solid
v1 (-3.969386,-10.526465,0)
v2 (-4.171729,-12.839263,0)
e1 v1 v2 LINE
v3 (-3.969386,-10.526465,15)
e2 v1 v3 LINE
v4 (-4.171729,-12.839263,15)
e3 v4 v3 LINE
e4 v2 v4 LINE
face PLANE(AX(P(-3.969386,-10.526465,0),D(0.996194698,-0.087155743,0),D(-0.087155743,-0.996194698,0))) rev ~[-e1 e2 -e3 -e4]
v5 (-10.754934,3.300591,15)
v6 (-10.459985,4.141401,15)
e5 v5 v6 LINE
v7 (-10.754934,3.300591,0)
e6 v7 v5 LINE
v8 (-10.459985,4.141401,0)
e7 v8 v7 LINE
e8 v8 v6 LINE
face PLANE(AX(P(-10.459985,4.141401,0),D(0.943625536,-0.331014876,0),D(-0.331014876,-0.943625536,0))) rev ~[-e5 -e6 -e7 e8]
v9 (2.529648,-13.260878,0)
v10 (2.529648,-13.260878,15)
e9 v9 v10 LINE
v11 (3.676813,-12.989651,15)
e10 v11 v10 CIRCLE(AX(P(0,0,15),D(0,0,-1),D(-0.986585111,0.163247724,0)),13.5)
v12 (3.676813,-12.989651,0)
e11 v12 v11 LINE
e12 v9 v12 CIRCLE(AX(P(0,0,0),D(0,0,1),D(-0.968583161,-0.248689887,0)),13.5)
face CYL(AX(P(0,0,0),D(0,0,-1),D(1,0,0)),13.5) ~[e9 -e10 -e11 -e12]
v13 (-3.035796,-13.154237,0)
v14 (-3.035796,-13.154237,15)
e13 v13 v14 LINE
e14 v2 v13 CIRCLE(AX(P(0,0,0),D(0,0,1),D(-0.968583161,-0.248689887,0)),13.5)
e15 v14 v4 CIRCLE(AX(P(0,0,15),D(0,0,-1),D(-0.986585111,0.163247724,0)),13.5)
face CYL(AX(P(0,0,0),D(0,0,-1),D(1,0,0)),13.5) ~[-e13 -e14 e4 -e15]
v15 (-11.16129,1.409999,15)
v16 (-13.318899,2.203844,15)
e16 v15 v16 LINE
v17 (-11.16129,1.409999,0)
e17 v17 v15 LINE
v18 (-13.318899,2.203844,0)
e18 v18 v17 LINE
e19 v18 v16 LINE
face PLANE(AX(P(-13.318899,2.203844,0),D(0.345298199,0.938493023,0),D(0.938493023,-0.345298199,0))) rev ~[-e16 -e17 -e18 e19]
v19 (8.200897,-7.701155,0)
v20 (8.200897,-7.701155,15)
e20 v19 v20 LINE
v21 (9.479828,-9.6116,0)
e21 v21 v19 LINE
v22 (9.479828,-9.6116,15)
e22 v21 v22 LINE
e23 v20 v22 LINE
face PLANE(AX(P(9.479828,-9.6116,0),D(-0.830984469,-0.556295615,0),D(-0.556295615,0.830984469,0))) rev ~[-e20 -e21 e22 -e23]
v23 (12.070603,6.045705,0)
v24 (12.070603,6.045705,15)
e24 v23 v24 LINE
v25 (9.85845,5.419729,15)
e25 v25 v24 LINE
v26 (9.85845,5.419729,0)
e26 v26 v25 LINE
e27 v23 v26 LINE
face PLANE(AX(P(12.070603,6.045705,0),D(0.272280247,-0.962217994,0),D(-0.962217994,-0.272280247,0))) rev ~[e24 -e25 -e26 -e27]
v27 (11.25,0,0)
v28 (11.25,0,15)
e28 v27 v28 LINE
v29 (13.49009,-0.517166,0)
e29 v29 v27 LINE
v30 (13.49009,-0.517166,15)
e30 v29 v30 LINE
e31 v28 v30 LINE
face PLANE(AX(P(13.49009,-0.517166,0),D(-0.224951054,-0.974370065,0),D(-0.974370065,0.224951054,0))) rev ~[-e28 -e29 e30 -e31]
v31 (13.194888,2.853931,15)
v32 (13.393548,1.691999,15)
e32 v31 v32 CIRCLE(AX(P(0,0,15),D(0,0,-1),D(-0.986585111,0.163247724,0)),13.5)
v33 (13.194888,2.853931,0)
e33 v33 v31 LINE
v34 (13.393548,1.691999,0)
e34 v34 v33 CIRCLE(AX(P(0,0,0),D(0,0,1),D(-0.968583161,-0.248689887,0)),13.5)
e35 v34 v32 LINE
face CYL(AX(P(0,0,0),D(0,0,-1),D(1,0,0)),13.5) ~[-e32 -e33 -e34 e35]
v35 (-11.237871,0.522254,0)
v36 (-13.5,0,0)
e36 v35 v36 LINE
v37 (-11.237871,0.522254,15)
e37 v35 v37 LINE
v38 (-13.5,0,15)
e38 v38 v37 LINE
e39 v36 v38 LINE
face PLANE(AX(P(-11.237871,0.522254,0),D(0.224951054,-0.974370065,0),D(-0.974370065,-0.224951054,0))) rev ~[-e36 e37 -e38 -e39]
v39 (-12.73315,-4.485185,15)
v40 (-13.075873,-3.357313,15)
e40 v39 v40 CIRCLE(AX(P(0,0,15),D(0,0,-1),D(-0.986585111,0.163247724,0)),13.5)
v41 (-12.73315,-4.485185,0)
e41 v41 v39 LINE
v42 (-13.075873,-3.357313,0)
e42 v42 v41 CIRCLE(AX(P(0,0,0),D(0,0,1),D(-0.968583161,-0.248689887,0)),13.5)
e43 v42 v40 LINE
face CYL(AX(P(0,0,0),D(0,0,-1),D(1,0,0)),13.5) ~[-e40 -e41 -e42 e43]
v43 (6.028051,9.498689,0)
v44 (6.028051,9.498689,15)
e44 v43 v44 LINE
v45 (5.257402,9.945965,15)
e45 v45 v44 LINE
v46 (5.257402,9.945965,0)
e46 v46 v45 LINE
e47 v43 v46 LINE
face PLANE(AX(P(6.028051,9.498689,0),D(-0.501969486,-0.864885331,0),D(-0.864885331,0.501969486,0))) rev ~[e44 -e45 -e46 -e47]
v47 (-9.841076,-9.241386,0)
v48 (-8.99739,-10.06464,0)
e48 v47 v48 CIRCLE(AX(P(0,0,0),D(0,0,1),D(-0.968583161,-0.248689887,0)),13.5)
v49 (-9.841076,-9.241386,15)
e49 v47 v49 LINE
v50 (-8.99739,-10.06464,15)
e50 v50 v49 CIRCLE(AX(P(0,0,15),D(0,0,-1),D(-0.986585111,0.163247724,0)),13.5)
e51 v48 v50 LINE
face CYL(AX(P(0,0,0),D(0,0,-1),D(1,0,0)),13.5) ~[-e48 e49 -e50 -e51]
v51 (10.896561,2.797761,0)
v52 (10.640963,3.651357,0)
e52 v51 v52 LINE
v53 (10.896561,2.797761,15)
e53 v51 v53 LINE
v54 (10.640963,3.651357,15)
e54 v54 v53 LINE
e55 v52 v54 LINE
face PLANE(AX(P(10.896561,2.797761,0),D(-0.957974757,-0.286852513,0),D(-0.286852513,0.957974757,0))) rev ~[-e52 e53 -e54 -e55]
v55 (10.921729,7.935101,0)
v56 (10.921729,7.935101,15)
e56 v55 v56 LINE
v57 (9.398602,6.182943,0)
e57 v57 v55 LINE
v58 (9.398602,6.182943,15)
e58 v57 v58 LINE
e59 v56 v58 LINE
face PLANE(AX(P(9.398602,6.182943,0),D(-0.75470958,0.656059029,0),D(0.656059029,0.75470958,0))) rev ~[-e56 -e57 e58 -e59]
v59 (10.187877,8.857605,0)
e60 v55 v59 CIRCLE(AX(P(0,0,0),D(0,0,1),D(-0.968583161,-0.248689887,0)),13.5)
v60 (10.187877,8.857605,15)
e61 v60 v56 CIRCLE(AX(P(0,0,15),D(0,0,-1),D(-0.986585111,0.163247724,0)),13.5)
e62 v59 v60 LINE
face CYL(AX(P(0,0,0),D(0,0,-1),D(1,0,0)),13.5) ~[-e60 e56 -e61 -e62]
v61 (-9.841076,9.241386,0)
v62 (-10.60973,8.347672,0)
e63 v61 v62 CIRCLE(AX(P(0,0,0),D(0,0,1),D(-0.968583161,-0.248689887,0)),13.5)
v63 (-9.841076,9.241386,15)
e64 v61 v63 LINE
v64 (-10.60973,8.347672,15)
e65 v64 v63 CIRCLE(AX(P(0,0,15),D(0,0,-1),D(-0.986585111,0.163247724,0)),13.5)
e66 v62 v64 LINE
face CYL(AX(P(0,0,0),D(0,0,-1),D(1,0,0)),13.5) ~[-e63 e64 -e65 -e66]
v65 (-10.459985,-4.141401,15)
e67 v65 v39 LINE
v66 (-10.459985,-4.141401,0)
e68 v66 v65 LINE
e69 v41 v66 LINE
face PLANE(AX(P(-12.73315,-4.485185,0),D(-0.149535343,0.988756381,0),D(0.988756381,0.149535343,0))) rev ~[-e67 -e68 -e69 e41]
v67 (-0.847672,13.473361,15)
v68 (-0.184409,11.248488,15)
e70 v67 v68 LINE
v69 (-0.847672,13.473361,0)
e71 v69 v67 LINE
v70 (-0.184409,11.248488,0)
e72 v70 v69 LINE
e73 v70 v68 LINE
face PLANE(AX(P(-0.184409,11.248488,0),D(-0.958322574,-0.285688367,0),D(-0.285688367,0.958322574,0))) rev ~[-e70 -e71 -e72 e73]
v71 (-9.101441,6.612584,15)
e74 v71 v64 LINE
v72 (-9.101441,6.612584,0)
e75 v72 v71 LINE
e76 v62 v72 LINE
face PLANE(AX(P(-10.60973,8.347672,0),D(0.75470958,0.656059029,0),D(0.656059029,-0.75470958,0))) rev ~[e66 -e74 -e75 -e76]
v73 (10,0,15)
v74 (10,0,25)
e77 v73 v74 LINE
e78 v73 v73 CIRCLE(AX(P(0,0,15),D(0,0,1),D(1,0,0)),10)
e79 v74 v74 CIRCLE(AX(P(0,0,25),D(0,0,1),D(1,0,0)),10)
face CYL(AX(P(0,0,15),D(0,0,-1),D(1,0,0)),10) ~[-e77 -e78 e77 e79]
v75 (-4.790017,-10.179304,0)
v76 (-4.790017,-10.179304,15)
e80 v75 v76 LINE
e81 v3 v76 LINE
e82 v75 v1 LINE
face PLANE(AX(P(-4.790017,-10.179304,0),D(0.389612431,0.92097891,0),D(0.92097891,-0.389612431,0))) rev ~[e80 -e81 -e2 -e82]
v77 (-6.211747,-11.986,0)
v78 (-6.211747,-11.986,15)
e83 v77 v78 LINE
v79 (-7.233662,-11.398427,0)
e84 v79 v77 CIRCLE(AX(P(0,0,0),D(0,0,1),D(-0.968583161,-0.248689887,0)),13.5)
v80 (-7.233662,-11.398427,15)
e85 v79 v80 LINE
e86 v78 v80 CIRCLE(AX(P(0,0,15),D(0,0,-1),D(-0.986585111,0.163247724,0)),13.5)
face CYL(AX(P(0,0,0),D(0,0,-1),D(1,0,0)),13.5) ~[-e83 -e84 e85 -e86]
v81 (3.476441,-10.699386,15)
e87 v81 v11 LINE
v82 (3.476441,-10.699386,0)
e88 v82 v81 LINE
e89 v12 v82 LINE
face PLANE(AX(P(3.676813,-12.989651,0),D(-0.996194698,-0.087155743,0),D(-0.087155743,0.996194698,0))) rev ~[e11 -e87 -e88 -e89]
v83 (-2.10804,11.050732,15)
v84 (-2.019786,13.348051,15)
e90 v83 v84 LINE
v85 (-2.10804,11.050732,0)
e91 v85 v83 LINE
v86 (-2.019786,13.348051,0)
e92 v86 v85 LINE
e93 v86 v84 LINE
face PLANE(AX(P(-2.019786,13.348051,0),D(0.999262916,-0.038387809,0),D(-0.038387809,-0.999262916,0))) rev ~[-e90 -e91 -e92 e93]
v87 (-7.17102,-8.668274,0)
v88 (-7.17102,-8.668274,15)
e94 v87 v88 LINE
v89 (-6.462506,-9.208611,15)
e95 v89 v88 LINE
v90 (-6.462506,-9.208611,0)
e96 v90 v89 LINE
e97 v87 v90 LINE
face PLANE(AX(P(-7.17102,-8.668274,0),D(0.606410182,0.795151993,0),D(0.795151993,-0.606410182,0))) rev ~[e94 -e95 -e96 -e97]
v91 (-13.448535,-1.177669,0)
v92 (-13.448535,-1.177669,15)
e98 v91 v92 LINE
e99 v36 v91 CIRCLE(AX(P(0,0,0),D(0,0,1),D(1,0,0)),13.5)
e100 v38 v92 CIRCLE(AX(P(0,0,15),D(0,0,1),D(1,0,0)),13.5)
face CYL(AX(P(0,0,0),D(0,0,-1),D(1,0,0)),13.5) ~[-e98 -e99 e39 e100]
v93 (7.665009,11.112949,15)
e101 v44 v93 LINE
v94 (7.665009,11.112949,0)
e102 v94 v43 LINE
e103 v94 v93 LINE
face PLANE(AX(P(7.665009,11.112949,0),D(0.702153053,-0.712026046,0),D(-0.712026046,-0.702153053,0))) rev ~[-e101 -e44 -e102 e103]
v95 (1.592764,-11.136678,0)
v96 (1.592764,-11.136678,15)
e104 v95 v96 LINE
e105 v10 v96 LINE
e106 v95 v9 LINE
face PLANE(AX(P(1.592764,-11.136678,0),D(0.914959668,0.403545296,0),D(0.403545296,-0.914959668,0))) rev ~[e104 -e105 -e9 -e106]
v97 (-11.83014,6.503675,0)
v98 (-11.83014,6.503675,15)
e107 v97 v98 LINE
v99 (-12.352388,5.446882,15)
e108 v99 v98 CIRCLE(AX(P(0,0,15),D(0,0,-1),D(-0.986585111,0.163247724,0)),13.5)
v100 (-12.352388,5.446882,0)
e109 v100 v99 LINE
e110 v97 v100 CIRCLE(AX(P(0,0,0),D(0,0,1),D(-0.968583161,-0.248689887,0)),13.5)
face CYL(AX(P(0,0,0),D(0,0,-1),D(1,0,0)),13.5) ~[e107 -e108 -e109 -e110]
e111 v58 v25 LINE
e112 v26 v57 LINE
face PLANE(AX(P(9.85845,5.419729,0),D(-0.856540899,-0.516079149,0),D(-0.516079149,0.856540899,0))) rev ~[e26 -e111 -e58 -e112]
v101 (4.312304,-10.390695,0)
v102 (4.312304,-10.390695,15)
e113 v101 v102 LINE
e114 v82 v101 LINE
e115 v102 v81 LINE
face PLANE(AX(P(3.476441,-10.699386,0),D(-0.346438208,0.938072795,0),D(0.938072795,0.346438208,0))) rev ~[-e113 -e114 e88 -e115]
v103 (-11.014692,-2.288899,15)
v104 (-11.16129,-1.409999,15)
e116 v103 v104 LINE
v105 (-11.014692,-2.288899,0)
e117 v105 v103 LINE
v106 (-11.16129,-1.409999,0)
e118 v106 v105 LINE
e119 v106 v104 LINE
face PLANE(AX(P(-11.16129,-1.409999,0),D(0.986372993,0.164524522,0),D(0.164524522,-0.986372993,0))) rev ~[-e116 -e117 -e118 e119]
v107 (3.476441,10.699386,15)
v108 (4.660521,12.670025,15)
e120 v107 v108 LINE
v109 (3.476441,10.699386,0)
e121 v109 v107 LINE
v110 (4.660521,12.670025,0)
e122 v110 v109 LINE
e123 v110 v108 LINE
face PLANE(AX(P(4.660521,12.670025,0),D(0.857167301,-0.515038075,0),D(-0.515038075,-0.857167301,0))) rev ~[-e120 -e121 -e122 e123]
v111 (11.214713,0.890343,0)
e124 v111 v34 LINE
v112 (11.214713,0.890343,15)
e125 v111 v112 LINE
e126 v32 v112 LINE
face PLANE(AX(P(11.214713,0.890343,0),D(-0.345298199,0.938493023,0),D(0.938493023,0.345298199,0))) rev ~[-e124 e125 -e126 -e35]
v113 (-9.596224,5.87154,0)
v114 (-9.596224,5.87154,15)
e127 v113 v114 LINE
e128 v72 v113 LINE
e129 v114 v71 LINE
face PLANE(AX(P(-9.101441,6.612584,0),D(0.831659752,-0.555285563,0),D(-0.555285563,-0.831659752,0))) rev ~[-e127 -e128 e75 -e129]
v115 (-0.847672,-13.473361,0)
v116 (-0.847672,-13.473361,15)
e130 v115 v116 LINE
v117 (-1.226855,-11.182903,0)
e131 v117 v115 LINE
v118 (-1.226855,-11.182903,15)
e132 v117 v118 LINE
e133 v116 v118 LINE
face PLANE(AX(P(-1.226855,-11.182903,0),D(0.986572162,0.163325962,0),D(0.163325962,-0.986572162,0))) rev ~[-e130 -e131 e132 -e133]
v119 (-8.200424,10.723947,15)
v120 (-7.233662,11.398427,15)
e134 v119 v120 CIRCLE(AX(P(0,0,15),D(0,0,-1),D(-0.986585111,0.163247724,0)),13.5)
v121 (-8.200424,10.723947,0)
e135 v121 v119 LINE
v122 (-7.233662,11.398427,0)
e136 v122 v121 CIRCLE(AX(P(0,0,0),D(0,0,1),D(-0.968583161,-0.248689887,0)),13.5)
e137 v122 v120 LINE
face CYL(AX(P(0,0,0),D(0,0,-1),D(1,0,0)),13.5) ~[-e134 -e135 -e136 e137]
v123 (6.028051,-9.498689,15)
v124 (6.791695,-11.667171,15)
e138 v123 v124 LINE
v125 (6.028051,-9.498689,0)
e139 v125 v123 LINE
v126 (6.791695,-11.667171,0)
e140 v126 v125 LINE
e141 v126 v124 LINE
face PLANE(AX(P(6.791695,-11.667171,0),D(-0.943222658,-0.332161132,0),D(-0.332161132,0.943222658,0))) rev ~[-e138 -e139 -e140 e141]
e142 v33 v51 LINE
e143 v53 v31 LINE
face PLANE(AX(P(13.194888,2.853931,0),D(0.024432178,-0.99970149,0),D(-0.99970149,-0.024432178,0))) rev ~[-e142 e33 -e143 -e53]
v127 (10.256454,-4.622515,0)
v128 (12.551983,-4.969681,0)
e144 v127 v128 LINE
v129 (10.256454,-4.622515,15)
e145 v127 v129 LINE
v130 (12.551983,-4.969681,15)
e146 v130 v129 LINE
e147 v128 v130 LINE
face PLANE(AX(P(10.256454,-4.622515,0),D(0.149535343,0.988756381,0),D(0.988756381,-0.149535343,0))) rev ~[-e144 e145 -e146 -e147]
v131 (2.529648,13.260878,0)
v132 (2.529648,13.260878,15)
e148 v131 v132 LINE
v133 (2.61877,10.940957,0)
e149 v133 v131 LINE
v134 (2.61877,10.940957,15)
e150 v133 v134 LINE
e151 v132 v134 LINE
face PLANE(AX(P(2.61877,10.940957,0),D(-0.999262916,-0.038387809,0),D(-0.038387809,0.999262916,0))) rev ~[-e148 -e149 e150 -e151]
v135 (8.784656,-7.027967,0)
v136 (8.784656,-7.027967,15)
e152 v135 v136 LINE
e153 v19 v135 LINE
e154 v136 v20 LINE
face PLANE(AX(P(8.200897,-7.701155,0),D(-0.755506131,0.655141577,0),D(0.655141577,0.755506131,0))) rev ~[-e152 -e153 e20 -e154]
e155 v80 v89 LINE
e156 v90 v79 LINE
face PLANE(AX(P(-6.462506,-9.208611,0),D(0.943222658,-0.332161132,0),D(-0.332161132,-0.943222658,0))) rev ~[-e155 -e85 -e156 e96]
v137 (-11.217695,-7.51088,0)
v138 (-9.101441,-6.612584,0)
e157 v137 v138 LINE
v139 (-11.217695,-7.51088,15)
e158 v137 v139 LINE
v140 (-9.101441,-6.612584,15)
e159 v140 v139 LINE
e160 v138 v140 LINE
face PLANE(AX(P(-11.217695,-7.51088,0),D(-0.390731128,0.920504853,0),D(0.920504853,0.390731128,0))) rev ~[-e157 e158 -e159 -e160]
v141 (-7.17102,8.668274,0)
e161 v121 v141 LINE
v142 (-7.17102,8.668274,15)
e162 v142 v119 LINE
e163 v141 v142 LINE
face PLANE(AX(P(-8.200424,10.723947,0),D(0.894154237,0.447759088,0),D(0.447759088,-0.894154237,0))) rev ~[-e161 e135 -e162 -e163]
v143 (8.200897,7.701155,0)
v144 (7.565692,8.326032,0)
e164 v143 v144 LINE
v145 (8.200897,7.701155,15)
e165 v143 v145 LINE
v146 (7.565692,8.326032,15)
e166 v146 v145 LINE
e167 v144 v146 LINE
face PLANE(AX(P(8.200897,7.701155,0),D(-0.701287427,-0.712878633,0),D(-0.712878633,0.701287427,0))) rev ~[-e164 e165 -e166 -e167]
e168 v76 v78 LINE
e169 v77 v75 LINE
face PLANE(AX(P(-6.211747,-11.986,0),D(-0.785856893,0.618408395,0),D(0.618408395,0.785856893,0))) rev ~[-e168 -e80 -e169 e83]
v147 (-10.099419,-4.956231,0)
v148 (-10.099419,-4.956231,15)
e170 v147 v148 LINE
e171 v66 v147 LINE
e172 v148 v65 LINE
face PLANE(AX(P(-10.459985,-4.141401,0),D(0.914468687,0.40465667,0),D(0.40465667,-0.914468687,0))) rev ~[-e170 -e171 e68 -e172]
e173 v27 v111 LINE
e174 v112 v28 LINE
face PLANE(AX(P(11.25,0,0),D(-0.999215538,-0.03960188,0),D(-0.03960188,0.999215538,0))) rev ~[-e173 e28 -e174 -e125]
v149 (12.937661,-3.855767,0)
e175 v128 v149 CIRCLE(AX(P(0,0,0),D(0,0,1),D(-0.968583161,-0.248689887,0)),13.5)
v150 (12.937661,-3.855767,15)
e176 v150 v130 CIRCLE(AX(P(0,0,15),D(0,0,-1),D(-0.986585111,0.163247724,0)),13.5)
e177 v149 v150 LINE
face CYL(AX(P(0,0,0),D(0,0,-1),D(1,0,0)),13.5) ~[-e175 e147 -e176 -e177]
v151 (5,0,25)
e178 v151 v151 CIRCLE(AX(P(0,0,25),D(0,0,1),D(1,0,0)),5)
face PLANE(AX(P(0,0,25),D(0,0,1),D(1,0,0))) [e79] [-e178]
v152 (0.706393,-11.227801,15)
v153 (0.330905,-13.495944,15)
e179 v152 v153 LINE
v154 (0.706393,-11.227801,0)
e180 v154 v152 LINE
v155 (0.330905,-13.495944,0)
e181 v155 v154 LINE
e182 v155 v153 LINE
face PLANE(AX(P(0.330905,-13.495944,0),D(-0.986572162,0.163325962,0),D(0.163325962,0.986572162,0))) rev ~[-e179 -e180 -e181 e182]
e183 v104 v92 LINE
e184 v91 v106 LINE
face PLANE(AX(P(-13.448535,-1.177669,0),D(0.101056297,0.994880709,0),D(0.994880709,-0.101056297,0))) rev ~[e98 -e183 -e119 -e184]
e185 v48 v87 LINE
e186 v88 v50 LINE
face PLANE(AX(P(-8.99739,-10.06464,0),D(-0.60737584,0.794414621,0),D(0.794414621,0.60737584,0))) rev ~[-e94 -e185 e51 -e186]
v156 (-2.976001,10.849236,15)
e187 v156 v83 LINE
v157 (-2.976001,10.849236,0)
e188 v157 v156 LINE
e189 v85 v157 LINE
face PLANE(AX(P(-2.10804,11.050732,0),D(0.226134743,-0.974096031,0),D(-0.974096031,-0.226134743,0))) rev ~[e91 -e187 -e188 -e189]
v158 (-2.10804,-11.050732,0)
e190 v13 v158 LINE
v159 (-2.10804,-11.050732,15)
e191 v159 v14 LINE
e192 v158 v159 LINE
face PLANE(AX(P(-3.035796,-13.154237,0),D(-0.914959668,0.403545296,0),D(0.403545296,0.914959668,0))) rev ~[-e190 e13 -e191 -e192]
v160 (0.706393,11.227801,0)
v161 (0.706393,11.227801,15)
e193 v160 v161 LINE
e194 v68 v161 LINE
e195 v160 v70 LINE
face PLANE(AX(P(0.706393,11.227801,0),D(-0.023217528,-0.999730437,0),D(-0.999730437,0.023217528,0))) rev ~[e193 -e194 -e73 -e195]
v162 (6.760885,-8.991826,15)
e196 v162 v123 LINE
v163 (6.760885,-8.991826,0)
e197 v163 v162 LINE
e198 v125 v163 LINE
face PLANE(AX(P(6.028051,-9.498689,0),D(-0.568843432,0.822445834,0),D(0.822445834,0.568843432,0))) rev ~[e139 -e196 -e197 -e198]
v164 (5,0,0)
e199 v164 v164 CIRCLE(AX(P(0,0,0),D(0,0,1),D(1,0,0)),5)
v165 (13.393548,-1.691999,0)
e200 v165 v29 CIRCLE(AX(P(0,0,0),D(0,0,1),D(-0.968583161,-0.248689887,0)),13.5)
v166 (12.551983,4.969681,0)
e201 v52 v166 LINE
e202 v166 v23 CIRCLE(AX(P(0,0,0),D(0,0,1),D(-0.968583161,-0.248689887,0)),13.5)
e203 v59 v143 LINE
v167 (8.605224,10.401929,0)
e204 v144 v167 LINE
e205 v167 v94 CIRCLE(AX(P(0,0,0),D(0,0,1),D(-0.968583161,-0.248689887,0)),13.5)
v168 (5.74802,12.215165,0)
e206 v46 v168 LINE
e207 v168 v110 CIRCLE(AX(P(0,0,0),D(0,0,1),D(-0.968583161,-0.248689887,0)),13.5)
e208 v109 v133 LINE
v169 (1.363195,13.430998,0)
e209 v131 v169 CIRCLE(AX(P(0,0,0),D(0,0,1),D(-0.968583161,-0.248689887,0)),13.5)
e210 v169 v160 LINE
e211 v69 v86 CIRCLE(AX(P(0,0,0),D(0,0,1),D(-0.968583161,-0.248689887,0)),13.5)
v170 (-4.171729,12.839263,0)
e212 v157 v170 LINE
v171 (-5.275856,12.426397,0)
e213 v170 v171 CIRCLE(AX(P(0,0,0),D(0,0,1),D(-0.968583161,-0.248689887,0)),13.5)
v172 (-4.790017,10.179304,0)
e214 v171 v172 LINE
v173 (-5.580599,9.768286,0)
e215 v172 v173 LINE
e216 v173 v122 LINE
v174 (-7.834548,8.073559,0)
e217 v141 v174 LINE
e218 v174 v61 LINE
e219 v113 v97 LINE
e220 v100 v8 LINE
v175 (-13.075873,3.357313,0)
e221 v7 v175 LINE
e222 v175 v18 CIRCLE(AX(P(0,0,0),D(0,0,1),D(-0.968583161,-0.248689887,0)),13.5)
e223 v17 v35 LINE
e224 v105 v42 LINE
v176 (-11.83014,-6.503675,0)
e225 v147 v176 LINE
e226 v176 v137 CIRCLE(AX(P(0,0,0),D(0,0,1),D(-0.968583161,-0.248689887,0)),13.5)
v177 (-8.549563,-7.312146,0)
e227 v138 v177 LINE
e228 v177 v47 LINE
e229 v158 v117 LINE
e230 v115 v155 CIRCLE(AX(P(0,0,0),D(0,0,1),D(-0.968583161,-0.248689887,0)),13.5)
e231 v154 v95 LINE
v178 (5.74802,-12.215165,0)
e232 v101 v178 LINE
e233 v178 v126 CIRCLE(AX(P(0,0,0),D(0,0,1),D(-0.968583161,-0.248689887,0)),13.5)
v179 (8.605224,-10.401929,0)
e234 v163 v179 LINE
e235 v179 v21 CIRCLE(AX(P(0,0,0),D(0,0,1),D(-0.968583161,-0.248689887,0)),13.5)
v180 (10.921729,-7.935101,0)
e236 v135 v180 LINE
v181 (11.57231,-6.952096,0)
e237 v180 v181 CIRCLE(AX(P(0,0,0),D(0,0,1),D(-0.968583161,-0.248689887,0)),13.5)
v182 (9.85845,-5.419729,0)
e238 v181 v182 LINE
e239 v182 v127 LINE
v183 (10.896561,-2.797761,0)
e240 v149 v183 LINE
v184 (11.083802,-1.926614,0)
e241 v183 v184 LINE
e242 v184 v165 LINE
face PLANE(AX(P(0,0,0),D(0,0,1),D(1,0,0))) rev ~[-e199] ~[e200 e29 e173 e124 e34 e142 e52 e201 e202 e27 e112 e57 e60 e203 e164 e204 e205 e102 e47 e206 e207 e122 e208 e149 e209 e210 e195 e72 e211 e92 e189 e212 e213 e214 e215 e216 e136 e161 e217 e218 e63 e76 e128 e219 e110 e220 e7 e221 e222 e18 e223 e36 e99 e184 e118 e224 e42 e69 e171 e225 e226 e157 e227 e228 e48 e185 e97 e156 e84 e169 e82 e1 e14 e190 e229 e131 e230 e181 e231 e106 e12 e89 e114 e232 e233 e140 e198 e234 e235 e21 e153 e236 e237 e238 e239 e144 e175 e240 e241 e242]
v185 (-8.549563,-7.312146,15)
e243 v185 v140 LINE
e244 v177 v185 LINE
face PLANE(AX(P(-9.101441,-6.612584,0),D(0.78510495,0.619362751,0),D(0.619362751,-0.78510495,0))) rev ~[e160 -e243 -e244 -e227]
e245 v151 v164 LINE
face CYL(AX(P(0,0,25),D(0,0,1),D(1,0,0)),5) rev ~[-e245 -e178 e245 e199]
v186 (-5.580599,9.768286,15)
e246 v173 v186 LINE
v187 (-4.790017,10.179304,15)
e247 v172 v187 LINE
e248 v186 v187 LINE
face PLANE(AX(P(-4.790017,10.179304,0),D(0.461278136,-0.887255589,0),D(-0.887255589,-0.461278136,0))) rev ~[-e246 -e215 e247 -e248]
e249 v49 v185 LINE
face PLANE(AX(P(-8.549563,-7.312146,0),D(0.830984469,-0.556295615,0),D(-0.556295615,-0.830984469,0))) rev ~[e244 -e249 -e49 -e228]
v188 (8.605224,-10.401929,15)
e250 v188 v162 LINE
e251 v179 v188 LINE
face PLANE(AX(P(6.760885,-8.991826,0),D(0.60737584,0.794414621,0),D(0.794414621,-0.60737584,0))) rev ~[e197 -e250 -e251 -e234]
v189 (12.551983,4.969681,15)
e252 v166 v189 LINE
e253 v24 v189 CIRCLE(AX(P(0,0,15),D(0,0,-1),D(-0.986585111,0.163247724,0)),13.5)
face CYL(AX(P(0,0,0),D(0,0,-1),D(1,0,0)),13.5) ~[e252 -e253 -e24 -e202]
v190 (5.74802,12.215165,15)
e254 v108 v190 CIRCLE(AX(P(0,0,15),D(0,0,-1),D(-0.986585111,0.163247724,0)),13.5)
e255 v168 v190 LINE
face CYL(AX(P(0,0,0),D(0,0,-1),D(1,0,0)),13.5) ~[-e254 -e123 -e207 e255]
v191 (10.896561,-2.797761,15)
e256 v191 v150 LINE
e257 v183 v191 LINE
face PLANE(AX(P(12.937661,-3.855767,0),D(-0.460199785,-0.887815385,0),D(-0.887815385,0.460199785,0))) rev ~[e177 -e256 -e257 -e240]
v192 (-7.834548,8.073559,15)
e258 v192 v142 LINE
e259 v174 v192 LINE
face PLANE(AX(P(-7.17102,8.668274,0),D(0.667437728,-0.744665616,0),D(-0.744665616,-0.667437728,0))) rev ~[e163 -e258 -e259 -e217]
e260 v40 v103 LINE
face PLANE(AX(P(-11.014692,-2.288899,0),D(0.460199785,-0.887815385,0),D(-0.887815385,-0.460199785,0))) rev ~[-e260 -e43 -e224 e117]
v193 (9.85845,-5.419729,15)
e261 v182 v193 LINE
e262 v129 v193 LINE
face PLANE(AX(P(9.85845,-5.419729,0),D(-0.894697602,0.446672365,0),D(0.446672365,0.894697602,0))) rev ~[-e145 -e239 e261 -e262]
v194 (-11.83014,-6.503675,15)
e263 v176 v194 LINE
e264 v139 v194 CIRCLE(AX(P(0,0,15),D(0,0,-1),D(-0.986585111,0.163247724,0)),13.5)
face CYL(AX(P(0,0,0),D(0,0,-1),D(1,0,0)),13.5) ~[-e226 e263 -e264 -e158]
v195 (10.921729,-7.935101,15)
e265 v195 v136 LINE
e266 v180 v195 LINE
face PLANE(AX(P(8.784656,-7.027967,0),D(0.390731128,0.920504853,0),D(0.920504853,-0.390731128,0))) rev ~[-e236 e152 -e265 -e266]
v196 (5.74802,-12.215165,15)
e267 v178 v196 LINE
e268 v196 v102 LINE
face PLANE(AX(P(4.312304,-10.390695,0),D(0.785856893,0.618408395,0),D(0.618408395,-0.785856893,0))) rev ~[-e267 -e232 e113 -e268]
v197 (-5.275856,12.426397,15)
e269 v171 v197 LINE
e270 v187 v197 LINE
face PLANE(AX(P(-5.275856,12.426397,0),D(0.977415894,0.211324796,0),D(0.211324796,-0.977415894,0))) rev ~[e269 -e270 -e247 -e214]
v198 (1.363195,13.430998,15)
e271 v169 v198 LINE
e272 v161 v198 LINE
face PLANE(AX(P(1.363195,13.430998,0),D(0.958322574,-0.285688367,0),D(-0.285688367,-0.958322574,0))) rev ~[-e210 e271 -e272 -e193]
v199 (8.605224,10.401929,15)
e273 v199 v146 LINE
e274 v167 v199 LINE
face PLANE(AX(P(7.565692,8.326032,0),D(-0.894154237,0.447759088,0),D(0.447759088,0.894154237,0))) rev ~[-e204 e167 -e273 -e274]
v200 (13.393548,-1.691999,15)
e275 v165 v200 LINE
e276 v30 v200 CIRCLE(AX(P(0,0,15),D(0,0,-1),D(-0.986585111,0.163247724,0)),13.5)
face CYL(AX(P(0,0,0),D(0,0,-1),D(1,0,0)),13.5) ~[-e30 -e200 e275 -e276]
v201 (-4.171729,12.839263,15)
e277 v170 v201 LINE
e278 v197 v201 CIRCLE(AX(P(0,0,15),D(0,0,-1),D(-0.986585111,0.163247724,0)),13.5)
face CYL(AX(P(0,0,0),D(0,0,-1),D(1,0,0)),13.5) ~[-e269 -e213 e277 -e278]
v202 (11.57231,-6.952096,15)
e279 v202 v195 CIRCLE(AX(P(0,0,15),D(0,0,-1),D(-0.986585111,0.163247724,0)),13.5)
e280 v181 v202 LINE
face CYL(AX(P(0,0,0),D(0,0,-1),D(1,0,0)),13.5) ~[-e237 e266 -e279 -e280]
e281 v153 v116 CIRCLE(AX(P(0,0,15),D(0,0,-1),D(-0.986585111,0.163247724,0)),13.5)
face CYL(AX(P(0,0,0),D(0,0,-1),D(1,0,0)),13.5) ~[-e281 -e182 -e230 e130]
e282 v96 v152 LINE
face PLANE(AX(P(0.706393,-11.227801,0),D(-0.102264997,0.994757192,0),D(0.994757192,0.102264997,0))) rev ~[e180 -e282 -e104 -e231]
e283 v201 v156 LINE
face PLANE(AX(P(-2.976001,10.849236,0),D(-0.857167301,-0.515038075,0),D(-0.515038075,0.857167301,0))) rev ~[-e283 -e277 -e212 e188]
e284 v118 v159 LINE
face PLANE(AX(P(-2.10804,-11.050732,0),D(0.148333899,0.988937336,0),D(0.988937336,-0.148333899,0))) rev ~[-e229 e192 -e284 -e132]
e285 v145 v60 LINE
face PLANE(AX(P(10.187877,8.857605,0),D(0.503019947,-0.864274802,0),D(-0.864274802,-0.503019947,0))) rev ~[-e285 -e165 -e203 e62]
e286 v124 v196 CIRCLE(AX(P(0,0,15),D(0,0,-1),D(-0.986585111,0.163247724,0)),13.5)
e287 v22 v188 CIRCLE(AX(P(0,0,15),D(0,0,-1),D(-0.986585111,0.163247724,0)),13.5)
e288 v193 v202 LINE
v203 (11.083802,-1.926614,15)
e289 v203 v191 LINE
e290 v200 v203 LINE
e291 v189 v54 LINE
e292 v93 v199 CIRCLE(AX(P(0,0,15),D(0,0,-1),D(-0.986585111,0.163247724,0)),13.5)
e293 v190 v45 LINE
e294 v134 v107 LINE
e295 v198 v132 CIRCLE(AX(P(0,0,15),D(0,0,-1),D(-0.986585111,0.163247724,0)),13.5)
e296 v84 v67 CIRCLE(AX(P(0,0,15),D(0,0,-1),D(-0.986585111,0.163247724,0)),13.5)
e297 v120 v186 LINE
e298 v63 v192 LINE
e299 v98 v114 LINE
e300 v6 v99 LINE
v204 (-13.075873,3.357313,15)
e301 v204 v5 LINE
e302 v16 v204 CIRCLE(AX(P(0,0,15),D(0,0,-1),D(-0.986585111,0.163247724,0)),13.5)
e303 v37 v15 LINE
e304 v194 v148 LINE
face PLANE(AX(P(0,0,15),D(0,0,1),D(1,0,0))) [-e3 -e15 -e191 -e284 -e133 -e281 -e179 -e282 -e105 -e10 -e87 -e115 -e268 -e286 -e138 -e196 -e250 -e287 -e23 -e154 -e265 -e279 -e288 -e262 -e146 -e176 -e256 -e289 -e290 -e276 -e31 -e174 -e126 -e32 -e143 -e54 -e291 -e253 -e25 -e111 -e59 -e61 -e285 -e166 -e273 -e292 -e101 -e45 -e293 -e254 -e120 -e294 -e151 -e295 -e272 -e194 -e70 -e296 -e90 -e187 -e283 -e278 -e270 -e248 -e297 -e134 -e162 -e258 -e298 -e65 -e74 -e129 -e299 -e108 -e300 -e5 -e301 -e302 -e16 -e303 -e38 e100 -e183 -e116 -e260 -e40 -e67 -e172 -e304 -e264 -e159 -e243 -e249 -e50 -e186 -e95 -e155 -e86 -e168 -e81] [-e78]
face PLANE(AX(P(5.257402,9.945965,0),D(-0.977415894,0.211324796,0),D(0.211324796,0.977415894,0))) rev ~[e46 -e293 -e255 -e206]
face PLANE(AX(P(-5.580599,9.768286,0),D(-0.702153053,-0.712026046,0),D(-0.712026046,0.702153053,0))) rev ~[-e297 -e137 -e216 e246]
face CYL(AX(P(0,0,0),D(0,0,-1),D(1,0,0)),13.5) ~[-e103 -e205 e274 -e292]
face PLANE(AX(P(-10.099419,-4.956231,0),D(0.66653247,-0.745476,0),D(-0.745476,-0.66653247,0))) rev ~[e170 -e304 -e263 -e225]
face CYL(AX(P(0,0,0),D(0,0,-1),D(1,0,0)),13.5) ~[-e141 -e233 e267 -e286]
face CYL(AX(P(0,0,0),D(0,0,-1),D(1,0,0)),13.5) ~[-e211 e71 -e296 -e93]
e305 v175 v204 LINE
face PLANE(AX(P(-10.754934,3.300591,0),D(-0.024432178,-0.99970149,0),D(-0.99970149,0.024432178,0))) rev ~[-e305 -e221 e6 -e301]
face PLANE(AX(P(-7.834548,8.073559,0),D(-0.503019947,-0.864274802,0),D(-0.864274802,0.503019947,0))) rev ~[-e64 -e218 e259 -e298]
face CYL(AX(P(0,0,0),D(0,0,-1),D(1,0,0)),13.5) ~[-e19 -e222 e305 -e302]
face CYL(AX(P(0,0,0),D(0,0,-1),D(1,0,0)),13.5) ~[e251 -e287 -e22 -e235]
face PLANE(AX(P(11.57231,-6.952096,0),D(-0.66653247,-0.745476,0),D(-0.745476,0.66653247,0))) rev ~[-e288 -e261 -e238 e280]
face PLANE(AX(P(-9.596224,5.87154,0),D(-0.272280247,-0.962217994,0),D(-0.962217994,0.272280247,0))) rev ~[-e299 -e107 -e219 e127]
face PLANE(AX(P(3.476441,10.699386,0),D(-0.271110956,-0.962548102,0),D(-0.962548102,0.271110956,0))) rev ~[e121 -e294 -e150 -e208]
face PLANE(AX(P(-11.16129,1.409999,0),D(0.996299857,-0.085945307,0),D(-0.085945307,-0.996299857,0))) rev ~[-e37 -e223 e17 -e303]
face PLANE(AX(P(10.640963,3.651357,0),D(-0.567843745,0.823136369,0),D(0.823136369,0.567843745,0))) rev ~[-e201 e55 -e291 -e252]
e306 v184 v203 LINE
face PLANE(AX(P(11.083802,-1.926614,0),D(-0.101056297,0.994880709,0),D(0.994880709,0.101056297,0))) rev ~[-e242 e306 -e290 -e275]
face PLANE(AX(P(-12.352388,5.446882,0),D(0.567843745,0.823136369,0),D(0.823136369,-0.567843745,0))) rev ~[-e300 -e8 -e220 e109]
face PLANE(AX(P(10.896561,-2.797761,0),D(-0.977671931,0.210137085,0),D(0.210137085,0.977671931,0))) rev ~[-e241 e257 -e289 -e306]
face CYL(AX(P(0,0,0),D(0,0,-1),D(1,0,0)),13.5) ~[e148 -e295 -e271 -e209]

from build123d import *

# Parameters (mm, degrees)
F0_R            = 13.5
F1_DEPTH        = 15
F2_R            = 10
F3_DEPTH        = 10
F4_R            = 5
F5_DEPTH        = 25.001
F7_DEPTH        = 25.001
F7_COPIES_COUNT = 25


# Not quite as in the source:
# - a pattern or mirror of a feature is missing from the dataset's text; its kind, count and spacing are read off the source's solid


with BuildPart() as f1:
    # F0 (on Top) → F1 (new body)
    with BuildSketch(Plane.XY):
        Circle(F0_R)
    extrude(amount=F1_DEPTH)

    # F2 (on face) → F3 (join)
    with BuildSketch(Plane.XY.offset(15)):
        Circle(F2_R)
    extrude(amount=F3_DEPTH)

    # F4 (on face) → F5 (cut, through all)
    with BuildSketch(Plane.XY.offset(25)):
        Circle(F4_R)
    extrude(amount=-F5_DEPTH, mode=Mode.SUBTRACT)

    # F6 (on face) → F7 (cut, through all)
    with BuildSketch(Plane(origin=(0, 0, 0), x_dir=(1, 0, 0), z_dir=(0, 0, -1))):
        with BuildLine():
            Line((-13.3188989942, -2.2038442736), (-11.1612903898, -1.4099988776))
            Line((-11.1612903898, -1.4099988776), (-11.2378712938, -0.5222535625))
            Line((-11.2378712938, -0.5222535625), (-13.5, 0))
            ThreePointArc((-13.5, 0), (-13.4546485726, -1.1056363729), (-13.3188989942, -2.2038442736))
        make_face()
    f7 = extrude(amount=-F7_DEPTH, mode=Mode.SUBTRACT)

    # F7_copies: F7 ×25 about axis
    f7_copies_axis = Axis((0, 0, 0), (0, 0, 1))
    for i in range(1, F7_COPIES_COUNT):
        add(f7.rotate(f7_copies_axis, i * 360 / F7_COPIES_COUNT), mode=Mode.SUBTRACT)


solid = f1.part
